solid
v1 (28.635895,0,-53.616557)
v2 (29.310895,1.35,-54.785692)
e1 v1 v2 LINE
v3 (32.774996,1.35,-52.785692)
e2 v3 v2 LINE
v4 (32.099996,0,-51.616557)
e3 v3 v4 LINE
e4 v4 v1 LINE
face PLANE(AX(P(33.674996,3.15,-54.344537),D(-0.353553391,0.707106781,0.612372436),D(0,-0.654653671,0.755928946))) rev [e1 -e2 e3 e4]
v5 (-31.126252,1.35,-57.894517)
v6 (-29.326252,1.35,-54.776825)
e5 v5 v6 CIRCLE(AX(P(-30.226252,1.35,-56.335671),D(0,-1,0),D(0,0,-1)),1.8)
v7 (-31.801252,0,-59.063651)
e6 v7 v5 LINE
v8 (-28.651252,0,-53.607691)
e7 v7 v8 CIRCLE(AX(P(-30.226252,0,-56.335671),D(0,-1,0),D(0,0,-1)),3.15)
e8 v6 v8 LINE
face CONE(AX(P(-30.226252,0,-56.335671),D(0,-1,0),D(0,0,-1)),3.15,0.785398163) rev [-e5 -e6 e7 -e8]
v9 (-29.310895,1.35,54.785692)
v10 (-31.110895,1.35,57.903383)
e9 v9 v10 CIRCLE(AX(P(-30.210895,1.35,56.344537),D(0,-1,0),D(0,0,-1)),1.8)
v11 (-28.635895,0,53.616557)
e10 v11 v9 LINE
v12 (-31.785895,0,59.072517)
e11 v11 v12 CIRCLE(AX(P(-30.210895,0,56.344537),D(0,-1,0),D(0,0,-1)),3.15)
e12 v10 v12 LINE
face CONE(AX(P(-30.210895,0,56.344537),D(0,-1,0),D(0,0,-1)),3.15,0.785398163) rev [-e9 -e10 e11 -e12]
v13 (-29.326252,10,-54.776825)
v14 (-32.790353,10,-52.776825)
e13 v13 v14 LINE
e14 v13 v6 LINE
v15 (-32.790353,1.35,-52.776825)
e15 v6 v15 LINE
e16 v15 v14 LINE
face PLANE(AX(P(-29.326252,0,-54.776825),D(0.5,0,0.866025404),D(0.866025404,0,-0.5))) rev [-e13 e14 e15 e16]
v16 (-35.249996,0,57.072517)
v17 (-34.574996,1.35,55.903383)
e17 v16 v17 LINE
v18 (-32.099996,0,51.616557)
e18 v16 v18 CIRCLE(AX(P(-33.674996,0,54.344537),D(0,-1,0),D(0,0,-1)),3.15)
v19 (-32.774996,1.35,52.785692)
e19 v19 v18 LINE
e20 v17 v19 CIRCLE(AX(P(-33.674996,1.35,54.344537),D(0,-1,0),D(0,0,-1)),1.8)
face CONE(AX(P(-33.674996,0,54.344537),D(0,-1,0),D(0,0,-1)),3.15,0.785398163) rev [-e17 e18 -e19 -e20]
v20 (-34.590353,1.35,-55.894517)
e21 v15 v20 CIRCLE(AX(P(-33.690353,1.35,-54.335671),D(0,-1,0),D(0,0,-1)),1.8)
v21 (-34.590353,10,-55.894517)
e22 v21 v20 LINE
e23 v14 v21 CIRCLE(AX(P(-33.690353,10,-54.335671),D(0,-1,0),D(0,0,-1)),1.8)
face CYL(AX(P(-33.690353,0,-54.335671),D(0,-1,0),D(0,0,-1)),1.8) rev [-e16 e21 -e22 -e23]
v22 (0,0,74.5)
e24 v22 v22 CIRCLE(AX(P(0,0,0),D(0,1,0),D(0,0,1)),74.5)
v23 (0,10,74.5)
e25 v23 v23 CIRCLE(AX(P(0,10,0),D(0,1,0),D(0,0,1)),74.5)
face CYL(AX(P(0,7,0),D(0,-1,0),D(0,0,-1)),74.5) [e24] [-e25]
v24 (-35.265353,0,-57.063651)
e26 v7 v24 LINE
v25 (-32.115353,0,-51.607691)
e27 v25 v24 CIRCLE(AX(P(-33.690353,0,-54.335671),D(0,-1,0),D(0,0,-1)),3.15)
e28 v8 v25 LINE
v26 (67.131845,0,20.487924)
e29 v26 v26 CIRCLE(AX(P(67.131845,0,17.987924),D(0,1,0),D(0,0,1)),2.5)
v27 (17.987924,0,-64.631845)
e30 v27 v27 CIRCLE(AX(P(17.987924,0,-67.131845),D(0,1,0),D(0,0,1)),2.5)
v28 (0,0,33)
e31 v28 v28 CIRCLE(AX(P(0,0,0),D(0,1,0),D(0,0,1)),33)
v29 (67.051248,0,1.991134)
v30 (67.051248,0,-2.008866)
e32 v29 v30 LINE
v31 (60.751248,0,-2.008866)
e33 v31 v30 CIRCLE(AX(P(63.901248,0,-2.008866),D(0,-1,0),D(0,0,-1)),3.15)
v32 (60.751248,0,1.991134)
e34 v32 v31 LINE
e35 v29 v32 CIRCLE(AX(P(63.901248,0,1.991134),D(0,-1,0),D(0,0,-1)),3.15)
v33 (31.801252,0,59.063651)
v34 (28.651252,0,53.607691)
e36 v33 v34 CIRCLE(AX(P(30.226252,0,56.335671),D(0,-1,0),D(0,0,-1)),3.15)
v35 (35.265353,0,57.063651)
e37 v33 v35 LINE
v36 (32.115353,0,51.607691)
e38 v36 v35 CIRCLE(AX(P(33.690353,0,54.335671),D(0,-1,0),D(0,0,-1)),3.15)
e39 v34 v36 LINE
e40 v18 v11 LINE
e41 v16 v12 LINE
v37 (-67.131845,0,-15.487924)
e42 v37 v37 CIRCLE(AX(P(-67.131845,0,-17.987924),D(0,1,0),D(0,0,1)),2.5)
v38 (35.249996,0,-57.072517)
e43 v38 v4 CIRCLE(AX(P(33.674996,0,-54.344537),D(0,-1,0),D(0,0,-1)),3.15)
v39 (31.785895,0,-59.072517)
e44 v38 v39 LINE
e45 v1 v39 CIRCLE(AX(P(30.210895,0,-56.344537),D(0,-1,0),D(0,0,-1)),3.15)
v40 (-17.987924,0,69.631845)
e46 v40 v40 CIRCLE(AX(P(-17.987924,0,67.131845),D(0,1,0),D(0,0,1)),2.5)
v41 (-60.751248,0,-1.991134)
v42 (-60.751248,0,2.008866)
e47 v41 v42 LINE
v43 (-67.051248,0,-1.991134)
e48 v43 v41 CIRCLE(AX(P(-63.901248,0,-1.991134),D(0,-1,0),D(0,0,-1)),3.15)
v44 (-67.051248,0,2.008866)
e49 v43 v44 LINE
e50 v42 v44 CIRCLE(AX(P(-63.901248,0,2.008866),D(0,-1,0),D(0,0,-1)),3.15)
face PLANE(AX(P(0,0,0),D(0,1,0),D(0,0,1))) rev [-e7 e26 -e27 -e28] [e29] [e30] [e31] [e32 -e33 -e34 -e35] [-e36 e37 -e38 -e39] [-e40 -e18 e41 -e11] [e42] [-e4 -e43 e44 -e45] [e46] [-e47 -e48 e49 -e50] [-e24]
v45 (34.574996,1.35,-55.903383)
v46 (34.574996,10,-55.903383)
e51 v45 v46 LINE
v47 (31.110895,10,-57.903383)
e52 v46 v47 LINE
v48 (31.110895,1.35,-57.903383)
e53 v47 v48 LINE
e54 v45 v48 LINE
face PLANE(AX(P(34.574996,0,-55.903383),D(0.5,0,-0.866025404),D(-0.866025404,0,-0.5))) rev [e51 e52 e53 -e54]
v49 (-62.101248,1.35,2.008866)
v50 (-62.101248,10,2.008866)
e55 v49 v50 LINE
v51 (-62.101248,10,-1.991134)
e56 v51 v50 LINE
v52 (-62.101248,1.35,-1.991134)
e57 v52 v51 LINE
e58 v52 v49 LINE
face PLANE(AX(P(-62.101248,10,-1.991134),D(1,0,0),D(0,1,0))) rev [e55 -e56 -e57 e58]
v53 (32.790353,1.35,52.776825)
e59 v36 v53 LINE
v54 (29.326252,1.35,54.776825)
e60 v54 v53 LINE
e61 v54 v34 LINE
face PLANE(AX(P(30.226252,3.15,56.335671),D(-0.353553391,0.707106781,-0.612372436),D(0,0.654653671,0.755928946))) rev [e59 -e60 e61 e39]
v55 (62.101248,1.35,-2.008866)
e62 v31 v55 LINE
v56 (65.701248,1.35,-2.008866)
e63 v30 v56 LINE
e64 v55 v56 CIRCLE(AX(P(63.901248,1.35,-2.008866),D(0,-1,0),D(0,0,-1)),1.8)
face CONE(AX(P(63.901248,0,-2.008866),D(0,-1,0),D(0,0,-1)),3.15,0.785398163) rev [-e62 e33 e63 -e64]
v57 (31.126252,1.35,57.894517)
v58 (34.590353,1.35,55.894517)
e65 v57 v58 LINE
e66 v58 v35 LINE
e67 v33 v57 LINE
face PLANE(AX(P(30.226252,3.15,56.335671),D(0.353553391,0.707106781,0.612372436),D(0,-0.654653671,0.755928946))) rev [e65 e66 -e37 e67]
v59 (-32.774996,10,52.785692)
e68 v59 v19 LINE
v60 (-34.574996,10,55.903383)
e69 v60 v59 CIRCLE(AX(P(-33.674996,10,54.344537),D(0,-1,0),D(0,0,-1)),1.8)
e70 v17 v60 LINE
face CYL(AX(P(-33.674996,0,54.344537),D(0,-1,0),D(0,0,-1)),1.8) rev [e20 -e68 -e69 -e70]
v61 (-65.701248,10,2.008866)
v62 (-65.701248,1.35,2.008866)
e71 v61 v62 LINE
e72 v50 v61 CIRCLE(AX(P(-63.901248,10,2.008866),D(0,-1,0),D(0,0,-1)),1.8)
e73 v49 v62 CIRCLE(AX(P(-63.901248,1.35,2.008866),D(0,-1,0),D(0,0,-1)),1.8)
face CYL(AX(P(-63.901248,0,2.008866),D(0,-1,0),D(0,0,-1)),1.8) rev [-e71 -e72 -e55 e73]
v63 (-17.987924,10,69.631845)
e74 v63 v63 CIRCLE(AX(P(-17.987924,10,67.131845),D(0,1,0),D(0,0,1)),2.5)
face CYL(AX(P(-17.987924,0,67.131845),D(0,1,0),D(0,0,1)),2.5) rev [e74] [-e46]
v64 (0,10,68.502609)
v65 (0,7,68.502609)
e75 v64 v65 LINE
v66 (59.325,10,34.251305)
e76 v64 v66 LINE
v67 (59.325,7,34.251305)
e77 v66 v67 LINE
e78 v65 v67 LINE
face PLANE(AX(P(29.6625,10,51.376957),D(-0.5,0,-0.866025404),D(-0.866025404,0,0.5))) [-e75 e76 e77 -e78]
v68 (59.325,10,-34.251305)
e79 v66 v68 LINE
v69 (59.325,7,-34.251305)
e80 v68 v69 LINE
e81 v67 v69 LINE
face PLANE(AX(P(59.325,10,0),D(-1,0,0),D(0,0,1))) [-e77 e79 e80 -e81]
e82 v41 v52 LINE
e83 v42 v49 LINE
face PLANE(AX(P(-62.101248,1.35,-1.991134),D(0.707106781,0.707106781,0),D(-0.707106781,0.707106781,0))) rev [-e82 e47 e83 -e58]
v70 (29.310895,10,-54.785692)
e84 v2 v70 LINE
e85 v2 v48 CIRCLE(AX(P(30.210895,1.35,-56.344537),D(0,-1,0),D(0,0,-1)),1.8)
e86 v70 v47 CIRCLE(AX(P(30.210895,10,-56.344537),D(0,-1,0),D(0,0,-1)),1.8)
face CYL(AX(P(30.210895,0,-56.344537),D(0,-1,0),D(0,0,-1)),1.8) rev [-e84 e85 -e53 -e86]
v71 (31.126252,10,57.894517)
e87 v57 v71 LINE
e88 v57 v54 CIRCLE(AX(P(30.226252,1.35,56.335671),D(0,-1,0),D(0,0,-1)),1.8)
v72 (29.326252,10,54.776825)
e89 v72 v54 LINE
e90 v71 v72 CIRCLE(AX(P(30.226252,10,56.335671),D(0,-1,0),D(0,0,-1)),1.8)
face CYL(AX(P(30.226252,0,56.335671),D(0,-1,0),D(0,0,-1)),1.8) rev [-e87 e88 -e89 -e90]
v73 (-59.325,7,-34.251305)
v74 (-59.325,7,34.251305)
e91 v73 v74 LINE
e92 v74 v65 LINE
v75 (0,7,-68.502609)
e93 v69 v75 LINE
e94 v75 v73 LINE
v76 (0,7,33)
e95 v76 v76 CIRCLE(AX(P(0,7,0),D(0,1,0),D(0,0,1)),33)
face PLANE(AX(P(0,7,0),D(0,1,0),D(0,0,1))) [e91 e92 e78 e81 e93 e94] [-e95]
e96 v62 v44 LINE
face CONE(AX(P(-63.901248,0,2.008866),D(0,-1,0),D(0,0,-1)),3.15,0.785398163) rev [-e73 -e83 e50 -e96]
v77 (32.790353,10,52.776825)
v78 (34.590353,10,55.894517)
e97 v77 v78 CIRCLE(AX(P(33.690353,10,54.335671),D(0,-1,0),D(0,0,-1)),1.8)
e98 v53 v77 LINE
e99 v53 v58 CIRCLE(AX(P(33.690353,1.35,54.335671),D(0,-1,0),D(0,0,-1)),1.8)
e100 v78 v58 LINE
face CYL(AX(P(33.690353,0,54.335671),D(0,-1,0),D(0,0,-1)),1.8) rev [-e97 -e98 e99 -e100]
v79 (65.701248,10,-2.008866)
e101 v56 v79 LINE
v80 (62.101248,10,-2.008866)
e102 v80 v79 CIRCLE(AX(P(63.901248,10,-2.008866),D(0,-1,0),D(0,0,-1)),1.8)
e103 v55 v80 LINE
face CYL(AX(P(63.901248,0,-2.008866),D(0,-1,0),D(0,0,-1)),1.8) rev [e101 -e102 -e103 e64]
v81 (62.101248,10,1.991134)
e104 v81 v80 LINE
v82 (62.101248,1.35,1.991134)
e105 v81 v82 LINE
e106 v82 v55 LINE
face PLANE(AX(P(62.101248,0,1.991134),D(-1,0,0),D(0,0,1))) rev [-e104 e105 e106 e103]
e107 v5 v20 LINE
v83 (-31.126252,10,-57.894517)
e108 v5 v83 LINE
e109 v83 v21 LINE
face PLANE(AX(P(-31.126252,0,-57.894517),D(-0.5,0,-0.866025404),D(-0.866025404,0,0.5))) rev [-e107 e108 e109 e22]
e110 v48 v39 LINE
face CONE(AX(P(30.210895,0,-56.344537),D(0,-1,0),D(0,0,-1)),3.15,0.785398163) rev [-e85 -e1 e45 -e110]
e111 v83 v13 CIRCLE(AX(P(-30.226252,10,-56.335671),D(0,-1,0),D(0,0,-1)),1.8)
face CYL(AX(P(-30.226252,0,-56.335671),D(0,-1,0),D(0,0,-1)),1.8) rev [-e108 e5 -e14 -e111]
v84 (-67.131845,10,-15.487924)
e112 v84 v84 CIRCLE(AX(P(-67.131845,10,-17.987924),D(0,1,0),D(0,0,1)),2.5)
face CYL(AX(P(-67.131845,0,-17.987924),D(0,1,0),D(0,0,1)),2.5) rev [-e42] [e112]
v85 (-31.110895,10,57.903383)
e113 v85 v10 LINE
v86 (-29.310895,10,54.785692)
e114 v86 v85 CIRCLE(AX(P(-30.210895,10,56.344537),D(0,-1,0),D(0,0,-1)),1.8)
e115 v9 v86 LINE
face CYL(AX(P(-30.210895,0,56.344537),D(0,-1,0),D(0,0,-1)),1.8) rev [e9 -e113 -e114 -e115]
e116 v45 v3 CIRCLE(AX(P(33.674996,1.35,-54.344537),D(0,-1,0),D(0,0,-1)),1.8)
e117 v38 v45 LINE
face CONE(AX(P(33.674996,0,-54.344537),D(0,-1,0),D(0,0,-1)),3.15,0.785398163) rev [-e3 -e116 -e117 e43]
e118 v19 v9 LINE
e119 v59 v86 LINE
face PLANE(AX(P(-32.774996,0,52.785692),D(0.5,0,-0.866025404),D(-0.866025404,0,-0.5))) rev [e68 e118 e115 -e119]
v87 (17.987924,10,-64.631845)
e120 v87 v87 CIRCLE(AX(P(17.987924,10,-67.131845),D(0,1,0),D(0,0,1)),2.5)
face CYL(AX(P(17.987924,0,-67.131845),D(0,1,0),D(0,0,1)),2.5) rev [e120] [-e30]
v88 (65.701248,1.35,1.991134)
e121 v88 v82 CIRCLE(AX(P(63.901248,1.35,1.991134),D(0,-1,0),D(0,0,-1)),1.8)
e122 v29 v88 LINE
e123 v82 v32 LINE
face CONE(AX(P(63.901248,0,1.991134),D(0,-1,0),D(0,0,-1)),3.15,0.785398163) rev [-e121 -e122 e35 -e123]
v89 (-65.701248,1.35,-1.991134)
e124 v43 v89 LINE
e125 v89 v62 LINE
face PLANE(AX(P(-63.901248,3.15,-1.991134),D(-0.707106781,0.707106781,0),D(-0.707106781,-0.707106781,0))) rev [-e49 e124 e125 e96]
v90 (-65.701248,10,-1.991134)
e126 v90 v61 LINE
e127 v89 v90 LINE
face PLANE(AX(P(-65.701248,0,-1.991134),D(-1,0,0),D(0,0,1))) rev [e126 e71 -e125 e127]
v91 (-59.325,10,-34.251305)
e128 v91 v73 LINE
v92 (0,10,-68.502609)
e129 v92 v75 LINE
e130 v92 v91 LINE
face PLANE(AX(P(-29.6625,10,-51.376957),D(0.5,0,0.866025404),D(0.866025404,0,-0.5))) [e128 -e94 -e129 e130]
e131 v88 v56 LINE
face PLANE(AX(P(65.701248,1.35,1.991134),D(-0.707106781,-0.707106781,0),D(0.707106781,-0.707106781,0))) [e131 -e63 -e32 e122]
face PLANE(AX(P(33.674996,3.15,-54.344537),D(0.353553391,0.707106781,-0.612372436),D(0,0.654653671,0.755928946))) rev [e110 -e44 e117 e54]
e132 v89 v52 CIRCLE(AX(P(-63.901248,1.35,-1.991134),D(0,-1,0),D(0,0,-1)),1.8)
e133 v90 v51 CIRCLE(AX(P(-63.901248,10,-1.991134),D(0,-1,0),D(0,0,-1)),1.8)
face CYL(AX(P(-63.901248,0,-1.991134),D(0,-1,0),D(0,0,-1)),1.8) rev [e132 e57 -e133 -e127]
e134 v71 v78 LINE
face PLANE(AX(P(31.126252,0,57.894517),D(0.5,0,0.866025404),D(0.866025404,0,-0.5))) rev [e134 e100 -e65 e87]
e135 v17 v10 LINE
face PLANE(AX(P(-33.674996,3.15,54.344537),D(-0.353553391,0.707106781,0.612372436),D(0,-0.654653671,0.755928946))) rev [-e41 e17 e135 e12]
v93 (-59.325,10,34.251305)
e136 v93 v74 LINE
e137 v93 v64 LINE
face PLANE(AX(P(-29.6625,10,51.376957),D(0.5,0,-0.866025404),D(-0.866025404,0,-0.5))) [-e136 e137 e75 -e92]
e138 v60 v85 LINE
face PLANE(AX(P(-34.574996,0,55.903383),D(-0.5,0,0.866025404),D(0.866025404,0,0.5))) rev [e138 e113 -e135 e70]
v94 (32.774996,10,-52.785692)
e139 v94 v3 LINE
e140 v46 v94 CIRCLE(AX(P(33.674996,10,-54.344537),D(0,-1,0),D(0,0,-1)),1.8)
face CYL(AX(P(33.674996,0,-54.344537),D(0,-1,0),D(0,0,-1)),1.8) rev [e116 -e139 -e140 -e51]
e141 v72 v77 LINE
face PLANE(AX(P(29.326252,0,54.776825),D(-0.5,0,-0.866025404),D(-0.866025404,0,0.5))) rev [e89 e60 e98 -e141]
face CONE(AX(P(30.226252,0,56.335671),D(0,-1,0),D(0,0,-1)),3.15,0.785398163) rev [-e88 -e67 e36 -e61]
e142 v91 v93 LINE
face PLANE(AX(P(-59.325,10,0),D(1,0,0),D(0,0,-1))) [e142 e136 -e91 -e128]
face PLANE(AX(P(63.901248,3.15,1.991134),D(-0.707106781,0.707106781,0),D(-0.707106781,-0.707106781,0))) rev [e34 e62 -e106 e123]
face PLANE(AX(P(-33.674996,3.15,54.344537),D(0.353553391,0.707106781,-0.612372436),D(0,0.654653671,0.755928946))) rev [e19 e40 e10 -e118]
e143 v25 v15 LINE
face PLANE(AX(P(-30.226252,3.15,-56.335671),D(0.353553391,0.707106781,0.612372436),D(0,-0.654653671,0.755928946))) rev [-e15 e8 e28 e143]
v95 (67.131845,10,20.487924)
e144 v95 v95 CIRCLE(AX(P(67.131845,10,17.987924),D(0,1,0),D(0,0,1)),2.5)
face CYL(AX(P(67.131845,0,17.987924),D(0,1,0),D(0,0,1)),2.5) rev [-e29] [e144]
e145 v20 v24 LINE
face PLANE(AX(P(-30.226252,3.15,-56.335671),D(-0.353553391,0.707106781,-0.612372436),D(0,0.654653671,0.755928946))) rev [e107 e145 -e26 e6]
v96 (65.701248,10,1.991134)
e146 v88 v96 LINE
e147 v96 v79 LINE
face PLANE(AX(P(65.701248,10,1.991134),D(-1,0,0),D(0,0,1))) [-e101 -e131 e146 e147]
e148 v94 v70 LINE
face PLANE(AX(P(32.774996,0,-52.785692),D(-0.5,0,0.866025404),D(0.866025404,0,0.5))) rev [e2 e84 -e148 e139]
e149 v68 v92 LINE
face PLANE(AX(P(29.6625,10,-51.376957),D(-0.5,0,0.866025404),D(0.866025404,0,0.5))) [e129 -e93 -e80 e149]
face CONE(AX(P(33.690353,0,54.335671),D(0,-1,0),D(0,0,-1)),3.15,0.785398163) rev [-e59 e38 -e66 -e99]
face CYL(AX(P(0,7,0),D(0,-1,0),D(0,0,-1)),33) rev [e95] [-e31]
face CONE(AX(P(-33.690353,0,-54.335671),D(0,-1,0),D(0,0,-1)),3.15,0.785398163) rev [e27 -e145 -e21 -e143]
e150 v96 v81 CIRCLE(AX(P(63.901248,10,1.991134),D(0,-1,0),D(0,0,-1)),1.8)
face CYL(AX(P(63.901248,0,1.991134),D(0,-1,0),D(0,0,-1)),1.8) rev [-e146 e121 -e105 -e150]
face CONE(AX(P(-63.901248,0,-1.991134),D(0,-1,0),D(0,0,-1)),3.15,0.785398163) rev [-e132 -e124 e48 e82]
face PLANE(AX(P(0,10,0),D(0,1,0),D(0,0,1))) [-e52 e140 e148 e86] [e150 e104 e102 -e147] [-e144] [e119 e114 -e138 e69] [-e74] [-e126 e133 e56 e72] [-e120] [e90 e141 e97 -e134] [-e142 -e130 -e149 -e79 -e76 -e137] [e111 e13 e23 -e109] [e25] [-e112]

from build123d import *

# Parameters (mm, degrees)
CROQUIS1_R                                     = 74.5
CROQUIS1_R_2                                   = 33
SALIENTE_EXTRUIR1_DEPTH                        = 7
CROQUIS2_R                                     = 74.5
SALIENTE_EXTRUIR2_DEPTH                        = 3
CROQUIS4_R                                     = 2.5
CORTAR_EXTRUIR2_DEPTH                          = 106.832414694
CSK_START                                      = -1
CSK_SLOT_FOR_M3_FLAT_HEAD_MACHINE_SCREW2_DEPTH = 12
CIRPATTERN1_COUNT                              = 6


with BuildPart() as part:
    # Croquis1 → Saliente-Extruir1 (new body)
    with BuildSketch(Plane(origin=(0, 0, 0), x_dir=(1, 0, 0), z_dir=(0, 1, 0))):
        with Locations(Location((0, 0, 0), (0, 0, 270))):
            Circle(CROQUIS1_R)
        with Locations(Location((0, 0, 0), (0, 0, 270))):
            Circle(CROQUIS1_R_2, mode=Mode.SUBTRACT)
    extrude(amount=SALIENTE_EXTRUIR1_DEPTH)

    # Croquis2 → Saliente-Extruir2 (add)
    with BuildSketch(Plane(origin=(0, 7, 0), x_dir=(1, 0, 0), z_dir=(0, 1, 0))):
        with Locations(Location((0, 0, 0), (0, 0, 270))):
            Circle(CROQUIS2_R)
        Polygon((-59.325, 34.25130472), (-59.325, -34.25130472), (0, -68.502609439), (59.325, -34.25130472), (59.325, 34.25130472), (0, 68.502609439), align=None, mode=Mode.SUBTRACT)
    extrude(amount=SALIENTE_EXTRUIR2_DEPTH)

    # Croquis4 → Cortar-Extruir2 (cut, through all)
    with BuildSketch(Plane(origin=(0, 10, 0), x_dir=(1, 0, 0), z_dir=(0, 1, 0))):
        with Locations(Location((17.987923635, 67.131844927, 0), (0, 0, 270))):
            Circle(CROQUIS4_R)
        with Locations(Location((67.131844927, -17.987923635, 0), (0, 0, 270))):
            Circle(CROQUIS4_R)
        with Locations(Location((-17.987923635, -67.131844927, 0), (0, 0, 270))):
            Circle(CROQUIS4_R)
        with Locations(Location((-67.131844927, 17.987923635, 0), (0, 0, 270))):
            Circle(CROQUIS4_R)
    extrude(amount=-CORTAR_EXTRUIR2_DEPTH, mode=Mode.SUBTRACT)

    # CSK SLOT for M3 Flat Head Machine Screw2: read off the stored shape, not the designer's step
    # CSK SLOT for M3 Flat Head Machine Sc 2 → CSK SLOT for M3 Flat Head Machine Screw2 (cut)
    with BuildSketch(Plane(origin=(0, 0, 0), x_dir=(1, 0, 0), z_dir=(0, 1, 0)).offset(CSK_START)):
        with BuildLine():
            ThreePointArc((-31.110894632, -57.903382972), (-28.652048905, -57.244537245), (-29.310894632, -54.785691518))
            Line((-29.310894632, -54.785691518), (-32.774996247, -52.785691518))
            ThreePointArc((-32.774996247, -52.785691518), (-35.233841974, -53.444537245), (-34.574996247, -55.903382972))
            Line((-34.574996247, -55.903382972), (-31.110894632, -57.903382972))
        make_face()
    csk_slot_for_m3_flat_head_machine_screw2 = extrude(amount=CSK_SLOT_FOR_M3_FLAT_HEAD_MACHINE_SCREW2_DEPTH, mode=Mode.SUBTRACT)

    # CSK SLOT for M3 Flat Head Machine Sc 3: loft between two sections, ruled curve by curve
    csk_slot_for_m3_flat_head_machine_sc_3_from = [
        Edge.make_three_point_arc((-29.310894632, 1.35, 54.785691518), (-28.472228144, 1.35, 55.878662964), (-28.652048905, 1.35, 57.244537245)),
        Edge.make_three_point_arc((-28.652048905, 1.35, 57.244537245), (-29.74502035, 1.35, 58.083203732), (-31.110894632, 1.35, 57.903382972)),
        Edge.make_three_point_arc((-34.574996247, 1.35, 55.903382972), (-35.413662734, 1.35, 54.810411526), (-35.233841974, 1.35, 53.444537245)),
        Edge.make_three_point_arc((-35.233841974, 1.35, 53.444537245), (-34.140870528, 1.35, 52.605870758), (-32.774996247, 1.35, 52.785691518)),
        Edge.make_line((-31.110894632, 1.35, 57.903382972), (-34.574996247, 1.35, 55.903382972)),
        Edge.make_line((-29.310894632, 1.35, 54.785691518), (-32.774996247, 1.35, 52.785691518)),
    ]
    csk_slot_for_m3_flat_head_machine_sc_3_to = [
        Edge.make_three_point_arc((-28.635894632, 0, 53.616557223), (-27.168228279, 0, 55.529257253), (-27.48291461, 0, 57.919537245)),
        Edge.make_three_point_arc((-27.48291461, 0, 57.919537245), (-29.39561464, 0, 59.387203598), (-31.785894632, 0, 59.072517267)),
        Edge.make_three_point_arc((-35.249996247, 0, 57.072517267), (-36.7176626, 0, 55.159817237), (-36.402976269, 0, 52.769537245)),
        Edge.make_three_point_arc((-36.402976269, 0, 52.769537245), (-34.490276239, 0, 51.301870892), (-32.099996247, 0, 51.616557223)),
        Edge.make_line((-31.785894632, 0, 59.072517267), (-35.249996247, 0, 57.072517267)),
        Edge.make_line((-28.635894632, 0, 53.616557223), (-32.099996247, 0, 51.616557223)),
    ]
    csk_slot_for_m3_flat_head_machine_sc_3 = Solid(Shell([*[Face.make_surface_from_curves(csk_slot_for_m3_flat_head_machine_sc_3_from[k], csk_slot_for_m3_flat_head_machine_sc_3_to[k]) for k in range(6)], Face(Wire(csk_slot_for_m3_flat_head_machine_sc_3_from)), Face(Wire(csk_slot_for_m3_flat_head_machine_sc_3_to))]))
    add(csk_slot_for_m3_flat_head_machine_sc_3, mode=Mode.SUBTRACT)

    # CirPattern1: CSK SLOT for M3 Flat Head Machine Screw2, CSK SLOT for M3 Flat Head Machine Sc 3 ×6 about axis
    cirpattern1_axis = Axis((0, 0, 0), (0, 1, 0))
    add([csk_slot_for_m3_flat_head_machine_screw2.rotate(cirpattern1_axis, i * 360 / CIRPATTERN1_COUNT) for i in range(1, CIRPATTERN1_COUNT)], mode=Mode.SUBTRACT)
    add([csk_slot_for_m3_flat_head_machine_sc_3.rotate(cirpattern1_axis, i * 360 / CIRPATTERN1_COUNT) for i in range(1, CIRPATTERN1_COUNT)], mode=Mode.SUBTRACT)


solid = part.part
